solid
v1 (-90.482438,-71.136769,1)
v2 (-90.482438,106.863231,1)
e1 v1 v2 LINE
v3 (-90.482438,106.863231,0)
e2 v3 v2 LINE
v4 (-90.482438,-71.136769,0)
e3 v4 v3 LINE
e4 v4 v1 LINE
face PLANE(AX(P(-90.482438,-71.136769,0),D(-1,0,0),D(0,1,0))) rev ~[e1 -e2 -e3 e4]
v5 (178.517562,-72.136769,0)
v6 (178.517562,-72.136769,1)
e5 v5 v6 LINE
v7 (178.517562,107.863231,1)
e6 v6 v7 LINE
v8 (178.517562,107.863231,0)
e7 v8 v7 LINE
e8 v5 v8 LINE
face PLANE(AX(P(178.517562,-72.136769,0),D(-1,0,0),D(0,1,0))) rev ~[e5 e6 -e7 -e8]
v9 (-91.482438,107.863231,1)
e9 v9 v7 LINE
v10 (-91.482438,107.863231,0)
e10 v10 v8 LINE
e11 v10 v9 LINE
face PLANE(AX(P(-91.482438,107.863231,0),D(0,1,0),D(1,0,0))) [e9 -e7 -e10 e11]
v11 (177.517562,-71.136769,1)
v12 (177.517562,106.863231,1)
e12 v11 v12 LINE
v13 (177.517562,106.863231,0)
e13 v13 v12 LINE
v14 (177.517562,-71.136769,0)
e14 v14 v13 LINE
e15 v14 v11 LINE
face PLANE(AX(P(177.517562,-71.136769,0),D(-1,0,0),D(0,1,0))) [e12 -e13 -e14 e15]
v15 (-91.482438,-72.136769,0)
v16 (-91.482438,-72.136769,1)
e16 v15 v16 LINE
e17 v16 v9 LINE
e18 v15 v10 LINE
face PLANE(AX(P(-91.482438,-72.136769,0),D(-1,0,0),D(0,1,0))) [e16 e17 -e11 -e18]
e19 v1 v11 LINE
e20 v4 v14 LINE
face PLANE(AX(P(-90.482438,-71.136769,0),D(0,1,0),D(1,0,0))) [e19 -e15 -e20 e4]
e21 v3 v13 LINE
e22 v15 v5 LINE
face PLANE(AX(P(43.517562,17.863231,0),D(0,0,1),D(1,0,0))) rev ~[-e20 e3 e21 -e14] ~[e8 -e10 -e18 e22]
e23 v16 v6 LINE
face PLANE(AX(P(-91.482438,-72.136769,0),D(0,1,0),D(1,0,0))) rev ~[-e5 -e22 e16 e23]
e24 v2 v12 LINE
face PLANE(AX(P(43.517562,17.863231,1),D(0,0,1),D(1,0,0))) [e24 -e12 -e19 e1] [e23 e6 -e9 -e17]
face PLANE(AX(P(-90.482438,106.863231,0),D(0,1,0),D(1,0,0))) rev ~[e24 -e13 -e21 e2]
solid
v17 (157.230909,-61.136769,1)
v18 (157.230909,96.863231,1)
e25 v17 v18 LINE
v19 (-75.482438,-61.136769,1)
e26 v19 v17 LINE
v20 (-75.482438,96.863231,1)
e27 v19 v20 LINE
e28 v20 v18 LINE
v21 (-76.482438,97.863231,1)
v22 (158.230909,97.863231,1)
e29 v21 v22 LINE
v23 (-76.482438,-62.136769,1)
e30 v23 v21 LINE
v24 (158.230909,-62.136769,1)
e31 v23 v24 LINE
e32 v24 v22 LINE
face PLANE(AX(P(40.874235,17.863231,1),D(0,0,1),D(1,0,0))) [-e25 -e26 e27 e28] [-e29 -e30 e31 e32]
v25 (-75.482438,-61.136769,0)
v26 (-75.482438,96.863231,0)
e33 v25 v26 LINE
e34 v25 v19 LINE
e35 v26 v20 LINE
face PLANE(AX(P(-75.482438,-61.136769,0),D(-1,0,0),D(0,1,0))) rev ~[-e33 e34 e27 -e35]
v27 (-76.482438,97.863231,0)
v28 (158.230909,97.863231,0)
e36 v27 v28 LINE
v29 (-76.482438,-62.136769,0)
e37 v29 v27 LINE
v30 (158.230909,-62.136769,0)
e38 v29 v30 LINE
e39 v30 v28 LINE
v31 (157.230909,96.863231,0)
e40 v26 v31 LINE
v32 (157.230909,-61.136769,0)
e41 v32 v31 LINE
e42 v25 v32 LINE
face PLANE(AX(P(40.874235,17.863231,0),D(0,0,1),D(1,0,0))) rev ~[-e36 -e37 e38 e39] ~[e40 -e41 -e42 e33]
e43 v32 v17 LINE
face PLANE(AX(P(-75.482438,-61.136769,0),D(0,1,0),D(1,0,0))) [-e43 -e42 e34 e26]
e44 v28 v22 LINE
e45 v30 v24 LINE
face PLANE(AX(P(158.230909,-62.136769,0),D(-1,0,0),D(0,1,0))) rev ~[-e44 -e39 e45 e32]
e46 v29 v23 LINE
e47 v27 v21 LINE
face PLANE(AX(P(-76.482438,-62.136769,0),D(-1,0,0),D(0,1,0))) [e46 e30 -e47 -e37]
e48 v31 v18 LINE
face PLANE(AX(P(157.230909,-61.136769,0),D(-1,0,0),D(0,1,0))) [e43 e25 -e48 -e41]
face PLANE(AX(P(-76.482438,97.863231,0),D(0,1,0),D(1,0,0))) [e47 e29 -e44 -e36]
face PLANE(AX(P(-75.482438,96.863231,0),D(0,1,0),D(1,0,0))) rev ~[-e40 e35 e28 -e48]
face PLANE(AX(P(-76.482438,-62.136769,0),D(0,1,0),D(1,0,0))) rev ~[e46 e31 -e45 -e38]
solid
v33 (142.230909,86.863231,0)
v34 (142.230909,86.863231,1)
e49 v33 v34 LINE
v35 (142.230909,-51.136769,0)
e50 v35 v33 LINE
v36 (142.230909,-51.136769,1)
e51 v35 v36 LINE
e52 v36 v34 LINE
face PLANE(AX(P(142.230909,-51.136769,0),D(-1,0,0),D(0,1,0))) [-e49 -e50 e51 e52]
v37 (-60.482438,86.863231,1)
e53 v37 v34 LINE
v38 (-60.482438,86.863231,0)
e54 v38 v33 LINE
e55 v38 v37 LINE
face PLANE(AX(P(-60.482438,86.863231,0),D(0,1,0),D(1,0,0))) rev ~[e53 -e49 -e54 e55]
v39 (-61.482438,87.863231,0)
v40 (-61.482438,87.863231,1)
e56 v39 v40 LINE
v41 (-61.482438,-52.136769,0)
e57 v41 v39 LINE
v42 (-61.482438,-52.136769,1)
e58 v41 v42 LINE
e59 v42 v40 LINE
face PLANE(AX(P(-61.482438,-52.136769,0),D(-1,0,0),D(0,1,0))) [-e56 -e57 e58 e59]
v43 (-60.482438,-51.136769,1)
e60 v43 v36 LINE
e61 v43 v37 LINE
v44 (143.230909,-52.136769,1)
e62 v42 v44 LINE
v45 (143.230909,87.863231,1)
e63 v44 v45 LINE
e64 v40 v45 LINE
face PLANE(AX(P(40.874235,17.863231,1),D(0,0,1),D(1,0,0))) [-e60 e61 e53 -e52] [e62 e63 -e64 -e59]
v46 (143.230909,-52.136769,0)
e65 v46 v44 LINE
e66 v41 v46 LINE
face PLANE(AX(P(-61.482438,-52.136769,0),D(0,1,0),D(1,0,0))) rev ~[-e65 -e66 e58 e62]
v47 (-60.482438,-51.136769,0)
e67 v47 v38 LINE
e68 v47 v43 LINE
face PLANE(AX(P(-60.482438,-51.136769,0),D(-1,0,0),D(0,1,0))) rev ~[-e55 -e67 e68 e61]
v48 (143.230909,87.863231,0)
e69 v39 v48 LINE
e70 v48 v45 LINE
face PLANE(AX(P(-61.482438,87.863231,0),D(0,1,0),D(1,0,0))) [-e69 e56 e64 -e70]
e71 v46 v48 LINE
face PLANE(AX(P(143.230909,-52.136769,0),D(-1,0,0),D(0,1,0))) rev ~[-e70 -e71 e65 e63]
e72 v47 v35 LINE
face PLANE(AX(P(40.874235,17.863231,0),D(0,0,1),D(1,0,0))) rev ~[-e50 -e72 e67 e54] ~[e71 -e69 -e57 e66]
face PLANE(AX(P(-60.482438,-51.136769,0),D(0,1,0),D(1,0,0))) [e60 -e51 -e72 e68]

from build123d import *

# Parameters (mm, degrees)
F1_W     = 270
F1_H     = 180
F1_W_2   = 268
F1_H_2   = 178
F2_DEPTH = 1
F1_W_3   = 234.7133469
F1_H_3   = 160
F1_W_4   = 232.7133469
F1_H_4   = 158
F1_W_5   = 204.7133469
F1_H_5   = 140
F1_W_6   = 202.7133469
F1_H_6   = 138


# Not quite as in the source:
# - a feature names something its author has since deleted; it is built from what else it names


with BuildPart() as f2:
    # F1 (on Top) → F2 (new body)
    with BuildSketch(Plane.XY):
        with Locations((43.5175617039, 17.8632308638)):
            Rectangle(F1_W, F1_H)
        with Locations((43.5175617039, 17.8632308638)):
            Rectangle(F1_W_2, F1_H_2, mode=Mode.SUBTRACT)
    extrude(amount=F2_DEPTH)


with BuildPart() as f2b:
    # F1 (on Top) → F2, piece 2 (new body)
    with BuildSketch(Plane.XY):
        with Locations((40.8742351539, 17.8632308638)):
            Rectangle(F1_W_3, F1_H_3)
        with Locations((40.8742351539, 17.8632308638)):
            Rectangle(F1_W_4, F1_H_4, mode=Mode.SUBTRACT)
    extrude(amount=F2_DEPTH)


with BuildPart() as f2c:
    # F1 (on Top) → F2, piece 3 (new body)
    with BuildSketch(Plane.XY):
        with Locations((40.8742351539, 17.8632308638)):
            Rectangle(F1_W_5, F1_H_5)
        with Locations((40.8742351539, 17.8632308638)):
            Rectangle(F1_W_6, F1_H_6, mode=Mode.SUBTRACT)
    extrude(amount=F2_DEPTH)


solid = Compound([f2.part, f2b.part, f2c.part])
